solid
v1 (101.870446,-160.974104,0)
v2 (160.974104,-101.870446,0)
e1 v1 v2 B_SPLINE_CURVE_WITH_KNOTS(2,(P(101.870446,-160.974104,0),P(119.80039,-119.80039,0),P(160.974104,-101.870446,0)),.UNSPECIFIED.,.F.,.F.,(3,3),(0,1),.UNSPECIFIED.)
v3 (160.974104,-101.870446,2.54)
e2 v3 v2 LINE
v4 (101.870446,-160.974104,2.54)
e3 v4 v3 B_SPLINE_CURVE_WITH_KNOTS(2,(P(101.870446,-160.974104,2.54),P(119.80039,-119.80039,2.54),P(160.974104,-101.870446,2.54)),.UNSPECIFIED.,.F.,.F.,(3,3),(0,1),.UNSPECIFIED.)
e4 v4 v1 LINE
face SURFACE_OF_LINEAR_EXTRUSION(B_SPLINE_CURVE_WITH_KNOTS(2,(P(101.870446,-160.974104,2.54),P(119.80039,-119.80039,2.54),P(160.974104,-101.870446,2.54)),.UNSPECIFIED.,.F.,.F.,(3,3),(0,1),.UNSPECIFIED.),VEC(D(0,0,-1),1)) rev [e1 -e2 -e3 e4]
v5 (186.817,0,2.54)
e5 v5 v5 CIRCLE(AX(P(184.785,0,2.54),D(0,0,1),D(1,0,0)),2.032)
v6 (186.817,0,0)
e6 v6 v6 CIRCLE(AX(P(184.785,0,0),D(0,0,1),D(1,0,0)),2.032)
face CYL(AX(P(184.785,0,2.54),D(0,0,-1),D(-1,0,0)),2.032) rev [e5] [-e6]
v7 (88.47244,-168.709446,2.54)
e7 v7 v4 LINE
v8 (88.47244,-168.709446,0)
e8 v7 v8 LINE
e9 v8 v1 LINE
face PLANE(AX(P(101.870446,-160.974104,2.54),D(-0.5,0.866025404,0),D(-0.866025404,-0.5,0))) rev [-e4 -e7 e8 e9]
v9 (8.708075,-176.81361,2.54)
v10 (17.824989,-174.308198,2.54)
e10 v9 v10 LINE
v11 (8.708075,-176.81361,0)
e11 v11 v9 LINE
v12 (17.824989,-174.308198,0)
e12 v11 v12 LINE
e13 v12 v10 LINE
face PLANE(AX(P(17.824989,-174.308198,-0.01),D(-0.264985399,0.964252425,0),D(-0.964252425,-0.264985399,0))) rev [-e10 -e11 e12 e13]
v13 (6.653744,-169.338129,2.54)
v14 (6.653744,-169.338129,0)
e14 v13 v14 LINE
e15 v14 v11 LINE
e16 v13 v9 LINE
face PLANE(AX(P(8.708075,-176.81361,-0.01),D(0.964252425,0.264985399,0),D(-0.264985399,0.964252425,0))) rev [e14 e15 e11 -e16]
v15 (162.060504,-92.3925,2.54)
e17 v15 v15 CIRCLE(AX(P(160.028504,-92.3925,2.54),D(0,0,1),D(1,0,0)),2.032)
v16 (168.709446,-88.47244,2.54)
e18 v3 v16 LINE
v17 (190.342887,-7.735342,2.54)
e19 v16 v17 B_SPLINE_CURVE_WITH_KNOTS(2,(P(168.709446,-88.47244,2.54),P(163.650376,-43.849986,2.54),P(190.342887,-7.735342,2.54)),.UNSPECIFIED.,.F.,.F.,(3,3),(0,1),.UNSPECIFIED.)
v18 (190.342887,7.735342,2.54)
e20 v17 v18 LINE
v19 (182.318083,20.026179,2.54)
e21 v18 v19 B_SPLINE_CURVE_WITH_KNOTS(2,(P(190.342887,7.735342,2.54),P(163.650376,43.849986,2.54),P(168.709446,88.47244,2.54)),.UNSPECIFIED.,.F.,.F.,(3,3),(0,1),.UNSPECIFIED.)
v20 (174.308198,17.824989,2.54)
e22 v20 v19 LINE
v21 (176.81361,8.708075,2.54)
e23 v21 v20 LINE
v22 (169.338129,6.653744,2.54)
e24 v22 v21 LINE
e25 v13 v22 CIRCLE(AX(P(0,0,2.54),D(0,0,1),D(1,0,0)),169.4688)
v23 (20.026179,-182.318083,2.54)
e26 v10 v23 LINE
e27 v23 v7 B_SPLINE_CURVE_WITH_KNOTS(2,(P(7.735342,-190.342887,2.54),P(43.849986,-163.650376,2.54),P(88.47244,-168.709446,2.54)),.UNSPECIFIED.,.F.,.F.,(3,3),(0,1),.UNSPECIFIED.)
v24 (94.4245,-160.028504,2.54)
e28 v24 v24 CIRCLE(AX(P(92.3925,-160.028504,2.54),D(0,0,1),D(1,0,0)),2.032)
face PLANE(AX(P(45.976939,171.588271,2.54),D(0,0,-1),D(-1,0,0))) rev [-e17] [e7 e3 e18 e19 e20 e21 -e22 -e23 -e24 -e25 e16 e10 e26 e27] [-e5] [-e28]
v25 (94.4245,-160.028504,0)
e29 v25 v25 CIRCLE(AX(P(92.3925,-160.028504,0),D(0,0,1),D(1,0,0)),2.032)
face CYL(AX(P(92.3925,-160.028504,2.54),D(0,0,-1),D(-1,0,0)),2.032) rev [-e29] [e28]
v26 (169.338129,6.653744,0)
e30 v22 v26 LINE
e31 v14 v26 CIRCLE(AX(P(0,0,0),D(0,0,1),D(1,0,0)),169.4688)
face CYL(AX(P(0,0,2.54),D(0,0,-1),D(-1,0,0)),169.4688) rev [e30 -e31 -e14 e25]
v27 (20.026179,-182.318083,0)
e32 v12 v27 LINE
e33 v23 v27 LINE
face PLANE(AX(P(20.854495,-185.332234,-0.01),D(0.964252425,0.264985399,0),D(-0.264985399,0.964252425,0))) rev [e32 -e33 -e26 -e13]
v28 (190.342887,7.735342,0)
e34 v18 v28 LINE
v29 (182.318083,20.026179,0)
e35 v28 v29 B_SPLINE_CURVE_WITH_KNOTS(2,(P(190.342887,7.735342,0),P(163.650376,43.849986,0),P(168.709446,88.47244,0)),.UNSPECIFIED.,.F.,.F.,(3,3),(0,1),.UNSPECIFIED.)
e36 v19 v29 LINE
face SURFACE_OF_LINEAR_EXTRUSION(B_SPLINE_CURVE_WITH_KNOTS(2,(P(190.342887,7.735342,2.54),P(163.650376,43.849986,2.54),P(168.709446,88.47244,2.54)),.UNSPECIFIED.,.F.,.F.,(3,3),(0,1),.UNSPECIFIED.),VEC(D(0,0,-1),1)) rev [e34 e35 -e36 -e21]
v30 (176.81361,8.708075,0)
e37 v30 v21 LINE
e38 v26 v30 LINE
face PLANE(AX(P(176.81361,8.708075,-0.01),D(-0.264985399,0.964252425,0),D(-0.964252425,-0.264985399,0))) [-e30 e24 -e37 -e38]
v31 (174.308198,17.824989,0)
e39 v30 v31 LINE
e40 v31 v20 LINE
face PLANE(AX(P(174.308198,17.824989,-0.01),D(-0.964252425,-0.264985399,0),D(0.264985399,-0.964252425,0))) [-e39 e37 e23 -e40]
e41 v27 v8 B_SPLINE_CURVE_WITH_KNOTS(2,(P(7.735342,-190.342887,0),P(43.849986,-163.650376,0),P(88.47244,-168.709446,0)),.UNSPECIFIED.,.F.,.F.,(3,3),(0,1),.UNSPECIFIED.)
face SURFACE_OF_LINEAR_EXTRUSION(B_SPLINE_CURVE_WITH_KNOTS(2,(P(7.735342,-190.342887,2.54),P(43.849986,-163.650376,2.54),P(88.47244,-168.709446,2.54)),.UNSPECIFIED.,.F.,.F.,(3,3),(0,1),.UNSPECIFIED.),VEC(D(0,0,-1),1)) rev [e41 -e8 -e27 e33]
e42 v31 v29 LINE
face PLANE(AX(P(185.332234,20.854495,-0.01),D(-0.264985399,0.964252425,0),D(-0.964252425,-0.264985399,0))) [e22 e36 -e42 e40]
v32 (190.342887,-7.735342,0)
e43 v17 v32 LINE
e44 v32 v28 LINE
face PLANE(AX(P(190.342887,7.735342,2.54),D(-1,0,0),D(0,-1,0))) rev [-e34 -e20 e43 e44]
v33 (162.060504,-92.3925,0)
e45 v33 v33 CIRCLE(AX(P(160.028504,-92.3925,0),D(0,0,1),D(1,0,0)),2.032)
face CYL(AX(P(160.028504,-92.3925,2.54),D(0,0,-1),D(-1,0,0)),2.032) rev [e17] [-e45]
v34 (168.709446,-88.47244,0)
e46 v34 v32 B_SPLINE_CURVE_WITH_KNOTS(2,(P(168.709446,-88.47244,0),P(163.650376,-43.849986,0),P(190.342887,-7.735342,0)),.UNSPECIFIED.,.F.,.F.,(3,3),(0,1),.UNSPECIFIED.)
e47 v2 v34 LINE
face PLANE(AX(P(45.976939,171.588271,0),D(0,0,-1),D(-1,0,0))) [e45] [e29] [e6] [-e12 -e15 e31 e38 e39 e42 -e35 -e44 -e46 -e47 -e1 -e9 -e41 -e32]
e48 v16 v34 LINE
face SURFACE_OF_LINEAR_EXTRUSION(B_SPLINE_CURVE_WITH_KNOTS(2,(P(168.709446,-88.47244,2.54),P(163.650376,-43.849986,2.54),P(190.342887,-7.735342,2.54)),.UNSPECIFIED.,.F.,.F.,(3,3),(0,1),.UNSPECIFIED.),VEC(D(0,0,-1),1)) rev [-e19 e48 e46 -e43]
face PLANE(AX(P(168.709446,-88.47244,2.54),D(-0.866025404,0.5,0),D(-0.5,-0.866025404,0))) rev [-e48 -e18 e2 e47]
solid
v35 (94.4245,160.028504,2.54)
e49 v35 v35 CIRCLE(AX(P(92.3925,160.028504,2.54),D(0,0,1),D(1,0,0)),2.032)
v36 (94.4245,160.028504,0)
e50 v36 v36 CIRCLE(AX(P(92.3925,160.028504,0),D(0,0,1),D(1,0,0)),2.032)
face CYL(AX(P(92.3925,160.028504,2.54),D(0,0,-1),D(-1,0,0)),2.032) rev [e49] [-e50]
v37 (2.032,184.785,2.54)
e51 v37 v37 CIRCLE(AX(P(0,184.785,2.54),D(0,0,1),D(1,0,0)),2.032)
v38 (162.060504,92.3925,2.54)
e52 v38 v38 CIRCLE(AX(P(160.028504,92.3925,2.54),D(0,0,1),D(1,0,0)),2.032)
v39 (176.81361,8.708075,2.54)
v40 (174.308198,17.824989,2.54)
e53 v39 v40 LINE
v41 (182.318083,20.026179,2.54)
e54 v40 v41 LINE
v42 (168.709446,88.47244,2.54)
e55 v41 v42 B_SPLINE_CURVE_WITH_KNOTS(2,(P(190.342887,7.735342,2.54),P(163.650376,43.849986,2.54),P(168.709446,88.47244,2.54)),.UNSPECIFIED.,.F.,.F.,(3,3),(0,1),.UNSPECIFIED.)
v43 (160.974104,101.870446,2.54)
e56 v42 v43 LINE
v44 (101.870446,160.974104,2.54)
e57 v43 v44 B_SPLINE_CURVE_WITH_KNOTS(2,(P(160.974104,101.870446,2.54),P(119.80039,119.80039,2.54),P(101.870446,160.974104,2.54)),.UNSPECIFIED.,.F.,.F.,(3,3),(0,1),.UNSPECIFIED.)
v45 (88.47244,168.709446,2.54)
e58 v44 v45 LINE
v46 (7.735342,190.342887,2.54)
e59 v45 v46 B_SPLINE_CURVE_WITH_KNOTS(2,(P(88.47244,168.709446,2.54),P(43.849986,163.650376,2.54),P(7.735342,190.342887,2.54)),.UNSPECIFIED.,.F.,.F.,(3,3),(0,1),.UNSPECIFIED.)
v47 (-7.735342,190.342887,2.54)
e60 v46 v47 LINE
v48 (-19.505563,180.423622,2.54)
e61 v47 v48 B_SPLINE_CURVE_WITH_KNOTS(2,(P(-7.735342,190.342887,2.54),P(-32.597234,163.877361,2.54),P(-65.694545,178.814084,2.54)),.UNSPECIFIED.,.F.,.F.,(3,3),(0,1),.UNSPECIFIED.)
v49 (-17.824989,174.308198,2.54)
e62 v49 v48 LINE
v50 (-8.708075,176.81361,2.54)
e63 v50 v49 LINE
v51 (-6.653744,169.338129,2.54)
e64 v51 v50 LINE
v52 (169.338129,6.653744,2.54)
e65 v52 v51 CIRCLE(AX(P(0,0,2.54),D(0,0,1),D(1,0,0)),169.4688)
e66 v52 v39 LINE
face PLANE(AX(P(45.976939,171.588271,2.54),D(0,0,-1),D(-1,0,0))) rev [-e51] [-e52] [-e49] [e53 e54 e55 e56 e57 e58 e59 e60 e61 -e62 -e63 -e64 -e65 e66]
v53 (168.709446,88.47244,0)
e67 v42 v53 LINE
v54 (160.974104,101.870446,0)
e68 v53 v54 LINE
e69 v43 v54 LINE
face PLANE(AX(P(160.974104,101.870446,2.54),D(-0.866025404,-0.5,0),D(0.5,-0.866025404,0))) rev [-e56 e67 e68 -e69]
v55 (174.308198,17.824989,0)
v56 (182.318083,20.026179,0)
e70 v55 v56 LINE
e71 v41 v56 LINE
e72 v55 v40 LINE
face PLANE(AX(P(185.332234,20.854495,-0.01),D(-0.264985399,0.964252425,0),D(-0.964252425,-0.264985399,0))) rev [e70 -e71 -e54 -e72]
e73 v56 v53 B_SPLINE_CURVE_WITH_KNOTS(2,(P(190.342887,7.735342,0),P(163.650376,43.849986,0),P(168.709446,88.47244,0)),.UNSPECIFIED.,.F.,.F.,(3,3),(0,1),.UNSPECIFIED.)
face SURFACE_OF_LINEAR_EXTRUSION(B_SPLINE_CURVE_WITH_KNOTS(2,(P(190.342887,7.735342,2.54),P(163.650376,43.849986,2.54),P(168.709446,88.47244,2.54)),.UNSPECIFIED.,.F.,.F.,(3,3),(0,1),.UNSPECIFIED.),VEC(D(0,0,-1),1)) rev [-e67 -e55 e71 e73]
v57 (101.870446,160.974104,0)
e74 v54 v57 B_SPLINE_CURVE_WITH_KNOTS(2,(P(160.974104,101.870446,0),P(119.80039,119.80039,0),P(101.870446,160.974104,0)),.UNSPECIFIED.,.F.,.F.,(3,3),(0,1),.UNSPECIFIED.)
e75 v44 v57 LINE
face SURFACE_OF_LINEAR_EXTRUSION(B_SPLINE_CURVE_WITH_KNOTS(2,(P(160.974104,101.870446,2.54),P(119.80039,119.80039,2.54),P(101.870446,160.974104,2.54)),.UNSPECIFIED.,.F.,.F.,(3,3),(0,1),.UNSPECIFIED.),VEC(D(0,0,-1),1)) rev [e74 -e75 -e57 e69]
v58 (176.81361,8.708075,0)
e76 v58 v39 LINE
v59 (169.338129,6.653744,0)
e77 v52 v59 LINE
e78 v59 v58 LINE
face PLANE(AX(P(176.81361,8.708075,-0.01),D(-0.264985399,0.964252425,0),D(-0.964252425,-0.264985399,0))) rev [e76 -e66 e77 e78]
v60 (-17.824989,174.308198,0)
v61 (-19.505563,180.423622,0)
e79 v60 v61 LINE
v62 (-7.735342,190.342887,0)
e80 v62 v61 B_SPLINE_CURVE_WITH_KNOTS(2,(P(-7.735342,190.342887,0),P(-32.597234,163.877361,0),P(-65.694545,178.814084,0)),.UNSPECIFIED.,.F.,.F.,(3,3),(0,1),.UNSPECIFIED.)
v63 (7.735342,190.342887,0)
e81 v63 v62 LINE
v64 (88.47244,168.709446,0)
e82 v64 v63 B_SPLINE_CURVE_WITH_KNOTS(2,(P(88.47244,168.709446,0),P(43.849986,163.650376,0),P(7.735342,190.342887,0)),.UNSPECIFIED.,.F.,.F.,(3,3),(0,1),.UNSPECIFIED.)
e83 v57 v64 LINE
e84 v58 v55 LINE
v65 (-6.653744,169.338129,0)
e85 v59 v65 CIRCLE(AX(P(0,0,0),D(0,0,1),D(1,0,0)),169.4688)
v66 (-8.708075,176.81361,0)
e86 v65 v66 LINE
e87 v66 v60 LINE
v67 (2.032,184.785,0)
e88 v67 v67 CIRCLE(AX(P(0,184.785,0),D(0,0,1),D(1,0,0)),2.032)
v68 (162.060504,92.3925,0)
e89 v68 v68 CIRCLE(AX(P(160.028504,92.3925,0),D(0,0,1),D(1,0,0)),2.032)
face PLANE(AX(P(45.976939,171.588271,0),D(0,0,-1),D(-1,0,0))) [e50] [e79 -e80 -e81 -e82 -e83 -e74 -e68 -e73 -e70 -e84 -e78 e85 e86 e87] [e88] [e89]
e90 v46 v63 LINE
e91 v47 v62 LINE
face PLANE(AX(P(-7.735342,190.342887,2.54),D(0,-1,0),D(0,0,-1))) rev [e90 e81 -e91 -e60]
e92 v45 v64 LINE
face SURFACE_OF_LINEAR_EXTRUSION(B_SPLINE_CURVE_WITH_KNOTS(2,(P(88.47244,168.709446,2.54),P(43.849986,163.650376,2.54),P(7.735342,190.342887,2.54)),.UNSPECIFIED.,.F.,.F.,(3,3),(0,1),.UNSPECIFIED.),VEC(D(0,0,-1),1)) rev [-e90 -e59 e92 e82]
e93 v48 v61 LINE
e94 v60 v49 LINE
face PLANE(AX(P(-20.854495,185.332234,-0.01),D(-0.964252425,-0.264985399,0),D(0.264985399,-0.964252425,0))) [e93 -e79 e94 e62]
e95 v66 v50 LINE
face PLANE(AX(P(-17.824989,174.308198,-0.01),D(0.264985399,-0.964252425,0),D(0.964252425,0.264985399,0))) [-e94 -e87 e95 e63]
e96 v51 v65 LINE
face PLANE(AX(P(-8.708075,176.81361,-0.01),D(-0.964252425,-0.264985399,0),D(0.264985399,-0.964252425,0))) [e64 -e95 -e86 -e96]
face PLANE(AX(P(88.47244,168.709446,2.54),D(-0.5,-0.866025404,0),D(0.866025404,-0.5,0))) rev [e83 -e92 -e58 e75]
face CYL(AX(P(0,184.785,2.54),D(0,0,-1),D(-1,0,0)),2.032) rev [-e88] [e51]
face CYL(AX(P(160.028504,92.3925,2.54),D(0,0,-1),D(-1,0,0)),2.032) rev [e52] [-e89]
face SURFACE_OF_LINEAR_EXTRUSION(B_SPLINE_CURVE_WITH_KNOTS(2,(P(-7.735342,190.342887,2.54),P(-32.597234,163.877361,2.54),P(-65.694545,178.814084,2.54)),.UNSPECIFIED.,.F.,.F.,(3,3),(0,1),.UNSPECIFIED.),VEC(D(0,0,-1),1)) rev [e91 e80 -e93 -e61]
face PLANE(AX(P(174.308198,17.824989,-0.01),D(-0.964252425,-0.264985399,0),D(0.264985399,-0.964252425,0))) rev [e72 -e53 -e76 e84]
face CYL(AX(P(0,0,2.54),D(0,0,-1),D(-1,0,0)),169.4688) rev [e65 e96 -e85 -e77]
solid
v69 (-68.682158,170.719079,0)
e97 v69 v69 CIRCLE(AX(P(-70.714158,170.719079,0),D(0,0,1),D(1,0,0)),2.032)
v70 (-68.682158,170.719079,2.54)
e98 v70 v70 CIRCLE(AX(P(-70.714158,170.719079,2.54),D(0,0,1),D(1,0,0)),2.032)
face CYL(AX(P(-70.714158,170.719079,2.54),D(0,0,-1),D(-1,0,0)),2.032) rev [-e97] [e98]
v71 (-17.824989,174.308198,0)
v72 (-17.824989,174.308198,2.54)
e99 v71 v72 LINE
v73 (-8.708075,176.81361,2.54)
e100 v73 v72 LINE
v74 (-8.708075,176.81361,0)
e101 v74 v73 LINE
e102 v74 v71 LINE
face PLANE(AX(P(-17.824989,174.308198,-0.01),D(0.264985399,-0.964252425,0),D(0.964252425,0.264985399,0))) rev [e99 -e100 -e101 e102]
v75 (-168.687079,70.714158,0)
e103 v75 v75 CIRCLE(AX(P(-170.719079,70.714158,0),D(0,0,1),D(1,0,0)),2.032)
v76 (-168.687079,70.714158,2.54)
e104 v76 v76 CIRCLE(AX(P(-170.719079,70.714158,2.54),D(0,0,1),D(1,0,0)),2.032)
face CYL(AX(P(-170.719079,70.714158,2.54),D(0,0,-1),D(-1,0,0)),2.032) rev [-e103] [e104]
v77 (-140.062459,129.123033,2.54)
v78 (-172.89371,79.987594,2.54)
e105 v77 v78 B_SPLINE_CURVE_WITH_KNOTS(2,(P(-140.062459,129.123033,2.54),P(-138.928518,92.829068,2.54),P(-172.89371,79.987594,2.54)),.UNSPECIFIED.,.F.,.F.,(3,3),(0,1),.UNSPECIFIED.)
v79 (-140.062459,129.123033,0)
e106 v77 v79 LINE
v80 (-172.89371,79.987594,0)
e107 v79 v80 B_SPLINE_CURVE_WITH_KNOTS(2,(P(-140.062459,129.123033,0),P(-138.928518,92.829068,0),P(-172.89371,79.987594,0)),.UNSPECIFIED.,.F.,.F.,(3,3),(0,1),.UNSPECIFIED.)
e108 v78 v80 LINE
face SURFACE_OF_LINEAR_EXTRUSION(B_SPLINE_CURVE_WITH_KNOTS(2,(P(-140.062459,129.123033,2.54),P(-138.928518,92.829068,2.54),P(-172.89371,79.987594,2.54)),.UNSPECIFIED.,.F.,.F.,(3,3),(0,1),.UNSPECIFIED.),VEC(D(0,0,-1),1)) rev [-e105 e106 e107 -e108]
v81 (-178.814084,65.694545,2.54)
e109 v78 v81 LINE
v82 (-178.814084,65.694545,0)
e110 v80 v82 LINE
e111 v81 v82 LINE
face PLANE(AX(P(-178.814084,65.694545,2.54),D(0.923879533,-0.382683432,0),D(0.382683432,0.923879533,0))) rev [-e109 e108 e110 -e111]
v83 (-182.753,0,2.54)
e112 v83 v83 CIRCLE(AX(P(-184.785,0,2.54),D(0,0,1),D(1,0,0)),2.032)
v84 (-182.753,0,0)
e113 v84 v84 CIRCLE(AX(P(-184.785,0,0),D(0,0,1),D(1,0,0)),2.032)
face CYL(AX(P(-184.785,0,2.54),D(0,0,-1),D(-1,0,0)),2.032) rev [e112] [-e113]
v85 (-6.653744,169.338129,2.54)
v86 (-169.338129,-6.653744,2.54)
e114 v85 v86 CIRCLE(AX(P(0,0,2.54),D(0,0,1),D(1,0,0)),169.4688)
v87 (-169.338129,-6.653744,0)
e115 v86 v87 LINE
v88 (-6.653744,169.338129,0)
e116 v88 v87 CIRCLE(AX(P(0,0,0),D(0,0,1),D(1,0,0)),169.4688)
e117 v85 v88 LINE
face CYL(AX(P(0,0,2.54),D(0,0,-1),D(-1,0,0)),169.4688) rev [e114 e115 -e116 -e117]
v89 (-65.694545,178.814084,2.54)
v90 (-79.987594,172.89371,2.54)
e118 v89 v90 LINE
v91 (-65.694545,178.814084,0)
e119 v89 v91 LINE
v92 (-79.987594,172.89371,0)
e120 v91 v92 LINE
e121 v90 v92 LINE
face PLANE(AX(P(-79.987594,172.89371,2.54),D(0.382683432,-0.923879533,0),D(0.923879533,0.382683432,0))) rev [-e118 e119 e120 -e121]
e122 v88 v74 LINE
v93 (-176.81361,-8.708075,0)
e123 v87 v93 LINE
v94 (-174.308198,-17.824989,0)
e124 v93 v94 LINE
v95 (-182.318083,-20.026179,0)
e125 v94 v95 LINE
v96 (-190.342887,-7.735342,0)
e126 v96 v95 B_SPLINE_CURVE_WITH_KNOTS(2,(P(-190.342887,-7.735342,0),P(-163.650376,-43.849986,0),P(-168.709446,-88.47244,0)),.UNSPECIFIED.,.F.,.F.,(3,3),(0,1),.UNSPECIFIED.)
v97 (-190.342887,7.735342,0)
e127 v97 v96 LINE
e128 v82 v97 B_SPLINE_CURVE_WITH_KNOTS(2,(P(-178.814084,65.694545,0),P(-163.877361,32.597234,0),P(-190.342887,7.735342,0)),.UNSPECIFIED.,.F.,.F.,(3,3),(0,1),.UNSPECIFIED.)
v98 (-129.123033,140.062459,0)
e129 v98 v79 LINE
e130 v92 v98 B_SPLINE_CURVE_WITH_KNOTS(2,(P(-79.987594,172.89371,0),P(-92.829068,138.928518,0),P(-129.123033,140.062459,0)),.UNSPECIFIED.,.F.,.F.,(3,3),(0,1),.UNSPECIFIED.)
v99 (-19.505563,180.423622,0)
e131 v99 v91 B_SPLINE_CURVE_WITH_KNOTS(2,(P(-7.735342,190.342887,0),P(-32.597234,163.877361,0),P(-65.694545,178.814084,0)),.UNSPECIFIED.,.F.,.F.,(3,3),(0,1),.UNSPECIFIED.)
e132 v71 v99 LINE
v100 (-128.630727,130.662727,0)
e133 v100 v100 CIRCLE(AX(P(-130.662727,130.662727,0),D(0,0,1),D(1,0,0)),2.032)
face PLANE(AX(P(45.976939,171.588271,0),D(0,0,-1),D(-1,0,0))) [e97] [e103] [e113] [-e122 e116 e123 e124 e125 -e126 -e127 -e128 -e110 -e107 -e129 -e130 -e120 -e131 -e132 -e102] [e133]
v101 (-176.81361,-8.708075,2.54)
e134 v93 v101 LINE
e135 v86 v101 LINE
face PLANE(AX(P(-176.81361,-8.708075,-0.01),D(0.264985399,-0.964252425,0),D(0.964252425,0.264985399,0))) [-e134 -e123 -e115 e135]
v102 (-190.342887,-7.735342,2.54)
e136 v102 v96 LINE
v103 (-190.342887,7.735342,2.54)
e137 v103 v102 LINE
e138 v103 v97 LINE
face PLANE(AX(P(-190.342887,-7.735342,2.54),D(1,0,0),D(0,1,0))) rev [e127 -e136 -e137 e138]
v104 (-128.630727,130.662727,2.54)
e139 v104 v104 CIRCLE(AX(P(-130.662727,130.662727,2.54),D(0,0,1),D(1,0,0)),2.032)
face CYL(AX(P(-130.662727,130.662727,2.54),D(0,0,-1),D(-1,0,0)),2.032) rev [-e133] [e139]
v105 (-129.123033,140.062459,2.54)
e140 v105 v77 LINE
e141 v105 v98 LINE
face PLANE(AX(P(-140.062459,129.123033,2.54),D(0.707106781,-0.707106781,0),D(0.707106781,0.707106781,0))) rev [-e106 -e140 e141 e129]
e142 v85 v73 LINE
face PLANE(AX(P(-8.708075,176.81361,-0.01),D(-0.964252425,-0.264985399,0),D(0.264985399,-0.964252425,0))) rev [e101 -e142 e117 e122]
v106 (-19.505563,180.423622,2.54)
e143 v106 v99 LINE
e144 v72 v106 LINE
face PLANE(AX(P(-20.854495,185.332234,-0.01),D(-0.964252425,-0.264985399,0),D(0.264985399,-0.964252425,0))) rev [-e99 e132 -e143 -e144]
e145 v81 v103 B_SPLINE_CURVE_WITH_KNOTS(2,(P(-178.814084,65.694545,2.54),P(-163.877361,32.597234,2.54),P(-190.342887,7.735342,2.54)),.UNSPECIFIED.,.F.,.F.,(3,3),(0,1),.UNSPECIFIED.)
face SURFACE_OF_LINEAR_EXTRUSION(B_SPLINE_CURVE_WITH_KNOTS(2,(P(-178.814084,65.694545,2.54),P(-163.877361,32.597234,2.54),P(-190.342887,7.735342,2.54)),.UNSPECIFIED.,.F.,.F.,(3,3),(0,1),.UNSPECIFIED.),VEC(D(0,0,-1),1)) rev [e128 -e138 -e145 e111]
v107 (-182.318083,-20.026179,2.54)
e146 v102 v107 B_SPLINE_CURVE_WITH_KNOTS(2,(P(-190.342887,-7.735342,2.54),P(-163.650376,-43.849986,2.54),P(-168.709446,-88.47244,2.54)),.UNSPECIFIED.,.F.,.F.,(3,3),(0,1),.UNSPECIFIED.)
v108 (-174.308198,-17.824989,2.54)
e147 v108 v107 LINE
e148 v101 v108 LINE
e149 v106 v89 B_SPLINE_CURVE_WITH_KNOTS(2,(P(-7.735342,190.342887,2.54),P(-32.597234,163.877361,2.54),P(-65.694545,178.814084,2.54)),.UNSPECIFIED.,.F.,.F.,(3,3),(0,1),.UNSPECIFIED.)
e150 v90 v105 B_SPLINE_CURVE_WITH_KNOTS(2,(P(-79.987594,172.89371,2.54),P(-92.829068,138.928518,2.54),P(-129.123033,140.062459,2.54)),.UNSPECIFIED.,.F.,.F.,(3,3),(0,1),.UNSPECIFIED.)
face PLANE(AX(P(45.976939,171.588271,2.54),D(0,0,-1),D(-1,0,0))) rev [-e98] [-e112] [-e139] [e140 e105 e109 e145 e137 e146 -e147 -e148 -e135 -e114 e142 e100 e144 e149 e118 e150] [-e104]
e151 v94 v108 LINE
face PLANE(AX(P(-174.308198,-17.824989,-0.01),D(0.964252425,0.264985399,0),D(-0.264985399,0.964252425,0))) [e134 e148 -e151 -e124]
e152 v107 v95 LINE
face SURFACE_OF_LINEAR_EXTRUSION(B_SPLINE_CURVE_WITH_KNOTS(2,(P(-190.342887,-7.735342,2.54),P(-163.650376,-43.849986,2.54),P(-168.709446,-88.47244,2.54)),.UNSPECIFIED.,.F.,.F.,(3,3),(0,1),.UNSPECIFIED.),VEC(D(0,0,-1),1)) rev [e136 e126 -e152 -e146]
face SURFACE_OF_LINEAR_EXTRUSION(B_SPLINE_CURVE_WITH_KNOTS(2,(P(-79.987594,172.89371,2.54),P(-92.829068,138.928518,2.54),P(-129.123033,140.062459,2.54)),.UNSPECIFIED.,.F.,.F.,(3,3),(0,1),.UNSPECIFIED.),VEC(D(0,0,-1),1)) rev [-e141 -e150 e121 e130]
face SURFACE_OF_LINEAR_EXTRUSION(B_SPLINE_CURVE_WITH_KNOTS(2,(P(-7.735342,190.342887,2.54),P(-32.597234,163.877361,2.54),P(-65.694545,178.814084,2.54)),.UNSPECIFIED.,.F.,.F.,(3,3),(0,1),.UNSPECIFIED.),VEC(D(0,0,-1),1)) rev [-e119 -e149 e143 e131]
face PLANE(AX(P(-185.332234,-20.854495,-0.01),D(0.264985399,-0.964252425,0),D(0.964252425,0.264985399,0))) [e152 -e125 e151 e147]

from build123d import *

# Parameters (mm, degrees)
SKETCH4_R           = 169.4688
SKETCH4_R_2         = 2.032
BOSS_EXTRUDE2_DEPTH = 2.54
SPLIT1_START        = -187
SPLIT1_OUTLINE_W    = 217.001338611
SPLIT1_OUTLINE_H    = 2.54
SPLIT1_DEPTH        = 373.122397647
SPLIT1_START_2      = 38.456242575
SPLIT1_2_OUTLINE_W  = 157.998661389
SPLIT1_2_OUTLINE_H  = 2.54
SPLIT1_2_DEPTH      = 147.666155072
SPLIT1_START_3      = 29.001338611
SPLIT1_3_OUTLINE_W  = 14.199535353
SPLIT1_3_OUTLINE_H  = 2.54
SPLIT1_3_DEPTH      = 9.454903964
SPLIT1_START_4      = -172.800464647
SPLIT1_4_OUTLINE_W  = 9.454903964
SPLIT1_4_OUTLINE_H  = 2.54
SPLIT1_4_DEPTH      = 31.915852609
SPLIT1_5_OUTLINE_R  = 2.032
SPLIT1_5_DEPTH      = 2.54
SPLIT1_6_OUTLINE_R  = 2.032
SPLIT1_6_DEPTH      = 2.54


with BuildPart() as part:
    # Sketch4 → Boss-Extrude2 (new body)
    with BuildSketch(Plane.XY):
        with BuildLine():
            Line((-7.735342369, 190.342886598), (7.735342369, 190.342886598))
            add(Edge.make_bspline(
                [(7.735342369, 190.342886598), (43.849986057, 163.650375876), (88.472440301, 168.709446408)],
                knots=[0, 0, 0, 1, 1, 1], degree=2))
            Line((88.472440301, 168.709446408), (101.870446297, 160.974104039))
            add(Edge.make_bspline(
                [(101.870446297, 160.974104039), (119.800389819, 119.800389819), (160.974104039, 101.870446297)],
                knots=[0, 0, 0, 1, 1, 1], degree=2))
            Line((160.974104039, 101.870446297), (168.709446408, 88.472440301))
            add(Edge.make_bspline(
                [(168.709446408, 88.472440301), (163.650375876, 43.849986057), (190.342886598, 7.735342369)],
                knots=[0, 0, 0, 1, 1, 1], degree=2))
            Line((190.342886598, 7.735342369), (190.342886598, -7.735342369))
            add(Edge.make_bspline(
                [(190.342886598, -7.735342369), (163.650375876, -43.849986057), (168.709446408, -88.472440301)],
                knots=[0, 0, 0, 1, 1, 1], degree=2))
            Line((168.709446408, -88.472440301), (160.974104039, -101.870446297))
            add(Edge.make_bspline(
                [(160.974104039, -101.870446297), (119.800389819, -119.800389819), (101.870446297, -160.974104039)],
                knots=[0, 0, 0, 1, 1, 1], degree=2))
            Line((101.870446297, -160.974104039), (88.472440301, -168.709446408))
            add(Edge.make_bspline(
                [(88.472440301, -168.709446408), (43.849986057, -163.650375876), (7.735342369, -190.342886598)],
                knots=[0, 0, 0, 1, 1, 1], degree=2))
            Line((7.735342369, -190.342886598), (-7.735342369, -190.342886598))
            add(Edge.make_bspline(
                [(-7.735342369, -190.342886598), (-43.849986057, -163.650375876), (-88.472440301, -168.709446408)],
                knots=[0, 0, 0, 1, 1, 1], degree=2))
            Line((-88.472440301, -168.709446408), (-101.870446297, -160.974104039))
            add(Edge.make_bspline(
                [(-101.870446297, -160.974104039), (-119.800389819, -119.800389819), (-160.974104039, -101.870446297)],
                knots=[0, 0, 0, 1, 1, 1], degree=2))
            Line((-160.974104039, -101.870446297), (-168.709446408, -88.472440301))
            add(Edge.make_bspline(
                [(-168.709446408, -88.472440301), (-163.650375876, -43.849986057), (-190.342886598, -7.735342369)],
                knots=[0, 0, 0, 1, 1, 1], degree=2))
            Line((-190.342886598, -7.735342369), (-190.342886598, 7.735342369))
            add(Edge.make_bspline(
                [(-190.342886598, 7.735342369), (-163.877360858, 32.597233808), (-178.814084455, 65.694544678)],
                knots=[0, 0, 0, 1, 1, 1], degree=2))
            Line((-178.814084455, 65.694544678), (-172.893709719, 79.987593661))
            add(Edge.make_bspline(
                [(-172.893709719, 79.987593661), (-138.92851822, 92.829068072), (-140.062458908, 129.12303282)],
                knots=[0, 0, 0, 1, 1, 1], degree=2))
            Line((-140.062458908, 129.12303282), (-129.12303282, 140.062458908))
            add(Edge.make_bspline(
                [(-129.12303282, 140.062458908), (-92.829068072, 138.92851822), (-79.987593661, 172.893709719)],
                knots=[0, 0, 0, 1, 1, 1], degree=2))
            Line((-79.987593661, 172.893709719), (-65.694544678, 178.814084455))
            add(Edge.make_bspline(
                [(-65.694544678, 178.814084455), (-32.597233808, 163.877360858), (-7.735342369, 190.342886598)],
                knots=[0, 0, 0, 1, 1, 1], degree=2))
        make_face()
        Circle(SKETCH4_R, mode=Mode.SUBTRACT)
        with Locations((0, 184.785)):
            Circle(SKETCH4_R_2, mode=Mode.SUBTRACT)
        with Locations((-160.028504238, -92.3925)):
            Circle(SKETCH4_R_2, mode=Mode.SUBTRACT)
        with Locations((-92.3925, -160.028504238)):
            Circle(SKETCH4_R_2, mode=Mode.SUBTRACT)
        with Locations((0, -184.785)):
            Circle(SKETCH4_R_2, mode=Mode.SUBTRACT)
        with Locations((92.3925, -160.028504238)):
            Circle(SKETCH4_R_2, mode=Mode.SUBTRACT)
        with Locations((160.028504238, -92.3925)):
            Circle(SKETCH4_R_2, mode=Mode.SUBTRACT)
        with Locations((184.785, 0)):
            Circle(SKETCH4_R_2, mode=Mode.SUBTRACT)
        with Locations((160.028504238, 92.3925)):
            Circle(SKETCH4_R_2, mode=Mode.SUBTRACT)
        with Locations((92.3925, 160.028504238)):
            Circle(SKETCH4_R_2, mode=Mode.SUBTRACT)
        with Locations((-70.71415805, 170.719079415)):
            Circle(SKETCH4_R_2, mode=Mode.SUBTRACT)
        with Locations((-130.662726562, 130.662726562)):
            Circle(SKETCH4_R_2, mode=Mode.SUBTRACT)
        with Locations((-170.719079415, 70.71415805)):
            Circle(SKETCH4_R_2, mode=Mode.SUBTRACT)
        with Locations((-184.785, 0)):
            Circle(SKETCH4_R_2, mode=Mode.SUBTRACT)
    extrude(amount=BOSS_EXTRUDE2_DEPTH)

    # Split1: read off the stored shape, not the designer's step
    # Split1 outline → Split1 (cut)
    with BuildSketch(Plane(origin=(0, 0, 0), x_dir=(-0.264985399113813, 0.96425242455308, 0), z_dir=(0.96425242455308, 0.264985399113813, 0)).offset(SPLIT1_START)):
        with Locations((-79.499330695, 1.27)):
            Rectangle(SPLIT1_OUTLINE_W, SPLIT1_OUTLINE_H)
    extrude(amount=SPLIT1_DEPTH, mode=Mode.SUBTRACT)

    # Split1 2 outline → Split1 2 (cut)
    with BuildSketch(Plane(origin=(0, 0, 0), x_dir=(-0.264985399113813, 0.96425242455308, 0), z_dir=(0.96425242455308, 0.264985399113813, 0)).offset(SPLIT1_START_2)):
        with Locations((108.000669305, 1.27)):
            Rectangle(SPLIT1_2_OUTLINE_W, SPLIT1_2_OUTLINE_H)
    extrude(amount=SPLIT1_2_DEPTH, mode=Mode.SUBTRACT)

    # Split1 3 outline → Split1 3 (cut)
    with BuildSketch(Plane(origin=(0, 0, 0), x_dir=(-0.264985399113813, 0.96425242455308, 0), z_dir=(0.96425242455308, 0.264985399113813, 0)).offset(SPLIT1_START_3)):
        with Locations((179.900232324, 1.27)):
            Rectangle(SPLIT1_3_OUTLINE_W, SPLIT1_3_OUTLINE_H)
    extrude(amount=SPLIT1_3_DEPTH, mode=Mode.SUBTRACT)

    # Split1 4 outline → Split1 4 (cut)
    with BuildSketch(Plane(origin=(0, 0, 0), x_dir=(-0.264985399113813, 0.96425242455308, 0), z_dir=(0.96425242455308, 0.264985399113813, 0)).offset(SPLIT1_START_4)):
        with Locations((33.728790593, 1.27)):
            Rectangle(SPLIT1_4_OUTLINE_W, SPLIT1_4_OUTLINE_H)
    extrude(amount=SPLIT1_4_DEPTH, mode=Mode.SUBTRACT)


with BuildPart() as body_2:
    # Split1 5 outline → Split1 5 (new body)
    with BuildSketch(Plane.XY):
        with BuildLine():
            Line((169.338128785, 6.653744292), (176.813609787, 8.708074949))
            Line((176.813609787, 8.708074949), (174.308198287, 17.824989021))
            Line((174.308198287, 17.824989021), (182.318082711, 20.026178634))
            add(Edge.make_bspline(
                [(182.318082711, 20.026178634), (164.494652391, 51.29674726), (168.709446408, 88.472440301)],
                knots=[0.166883721, 0.166883721, 0.166883721, 1, 1, 1], degree=2))
            Line((168.709446408, 88.472440301), (160.974104039, 101.870446297))
            add(Edge.make_bspline(
                [(160.974104039, 101.870446297), (119.800389819, 119.800389819), (101.870446297, 160.974104039)],
                knots=[0, 0, 0, 1, 1, 1], degree=2))
            Line((101.870446297, 160.974104039), (88.472440301, 168.709446408))
            add(Edge.make_bspline(
                [(88.472440301, 168.709446408), (43.849986057, 163.650375876), (7.735342369, 190.342886598)],
                knots=[0, 0, 0, 1, 1, 1], degree=2))
            Line((7.735342369, 190.342886598), (-7.735342369, 190.342886598))
            add(Edge.make_bspline(
                [(-7.735342369, 190.342886598), (-13.406219181, 184.306228583), (-19.505563426, 180.423621815)],
                knots=[0, 0, 0, 0.228095148, 0.228095148, 0.228095148], degree=2))
            Line((-19.505563426, 180.423621815), (-17.824989021, 174.308198287))
            Line((-17.824989021, 174.308198287), (-8.708074949, 176.813609787))
            Line((-8.708074949, 176.813609787), (-6.653744292, 169.338128785))
            ThreePointArc((-6.653744292, 169.338128785), (115.035231468, 124.445046886), (169.338128785, 6.653744292))
        make_face()
        with Locations((160.028504238, 92.3925)):
            Circle(SPLIT1_5_OUTLINE_R, mode=Mode.SUBTRACT)
        with Locations((0, 184.785)):
            Circle(SPLIT1_5_OUTLINE_R, mode=Mode.SUBTRACT)
        with Locations((92.3925, 160.028504238)):
            Circle(SPLIT1_5_OUTLINE_R, mode=Mode.SUBTRACT)
    extrude(amount=SPLIT1_5_DEPTH)


with BuildPart() as body_3:
    # Split1 6 outline → Split1 6 (new body)
    with BuildSketch(Plane.XY):
        with BuildLine():
            Line((6.653744292, -169.338128785), (8.708074949, -176.813609787))
            Line((8.708074949, -176.813609787), (17.824989021, -174.308198287))
            Line((17.824989021, -174.308198287), (20.026178634, -182.318082711))
            add(Edge.make_bspline(
                [(20.026178634, -182.318082711), (51.29674726, -164.494652391), (88.472440301, -168.709446408)],
                knots=[0.166883721, 0.166883721, 0.166883721, 1, 1, 1], degree=2))
            Line((88.472440301, -168.709446408), (101.870446297, -160.974104039))
            add(Edge.make_bspline(
                [(101.870446297, -160.974104039), (119.800389819, -119.800389819), (160.974104039, -101.870446297)],
                knots=[0, 0, 0, 1, 1, 1], degree=2))
            Line((160.974104039, -101.870446297), (168.709446408, -88.472440301))
            add(Edge.make_bspline(
                [(168.709446408, -88.472440301), (163.650375876, -43.849986057), (190.342886598, -7.735342369)],
                knots=[0, 0, 0, 1, 1, 1], degree=2))
            Line((190.342886598, -7.735342369), (190.342886598, 7.735342369))
            add(Edge.make_bspline(
                [(190.342886598, 7.735342369), (185.888341086, 13.762288489), (182.318082711, 20.026178634)],
                knots=[0, 0, 0, 0.166883721, 0.166883721, 0.166883721], degree=2))
            Line((182.318082711, 20.026178634), (174.308198287, 17.824989021))
            Line((174.308198287, 17.824989021), (176.813609787, 8.708074949))
            Line((176.813609787, 8.708074949), (169.338128785, 6.653744292))
            ThreePointArc((169.338128785, 6.653744292), (124.445046886, -115.035231468), (6.653744292, -169.338128785))
        make_face()
        with Locations((92.3925, -160.028504238)):
            Circle(SPLIT1_6_OUTLINE_R, mode=Mode.SUBTRACT)
        with Locations((160.028504238, -92.3925)):
            Circle(SPLIT1_6_OUTLINE_R, mode=Mode.SUBTRACT)
        with Locations((184.785, 0)):
            Circle(SPLIT1_6_OUTLINE_R, mode=Mode.SUBTRACT)
    extrude(amount=SPLIT1_6_DEPTH)


solid = Compound([part.part, body_2.part, body_3.part])
